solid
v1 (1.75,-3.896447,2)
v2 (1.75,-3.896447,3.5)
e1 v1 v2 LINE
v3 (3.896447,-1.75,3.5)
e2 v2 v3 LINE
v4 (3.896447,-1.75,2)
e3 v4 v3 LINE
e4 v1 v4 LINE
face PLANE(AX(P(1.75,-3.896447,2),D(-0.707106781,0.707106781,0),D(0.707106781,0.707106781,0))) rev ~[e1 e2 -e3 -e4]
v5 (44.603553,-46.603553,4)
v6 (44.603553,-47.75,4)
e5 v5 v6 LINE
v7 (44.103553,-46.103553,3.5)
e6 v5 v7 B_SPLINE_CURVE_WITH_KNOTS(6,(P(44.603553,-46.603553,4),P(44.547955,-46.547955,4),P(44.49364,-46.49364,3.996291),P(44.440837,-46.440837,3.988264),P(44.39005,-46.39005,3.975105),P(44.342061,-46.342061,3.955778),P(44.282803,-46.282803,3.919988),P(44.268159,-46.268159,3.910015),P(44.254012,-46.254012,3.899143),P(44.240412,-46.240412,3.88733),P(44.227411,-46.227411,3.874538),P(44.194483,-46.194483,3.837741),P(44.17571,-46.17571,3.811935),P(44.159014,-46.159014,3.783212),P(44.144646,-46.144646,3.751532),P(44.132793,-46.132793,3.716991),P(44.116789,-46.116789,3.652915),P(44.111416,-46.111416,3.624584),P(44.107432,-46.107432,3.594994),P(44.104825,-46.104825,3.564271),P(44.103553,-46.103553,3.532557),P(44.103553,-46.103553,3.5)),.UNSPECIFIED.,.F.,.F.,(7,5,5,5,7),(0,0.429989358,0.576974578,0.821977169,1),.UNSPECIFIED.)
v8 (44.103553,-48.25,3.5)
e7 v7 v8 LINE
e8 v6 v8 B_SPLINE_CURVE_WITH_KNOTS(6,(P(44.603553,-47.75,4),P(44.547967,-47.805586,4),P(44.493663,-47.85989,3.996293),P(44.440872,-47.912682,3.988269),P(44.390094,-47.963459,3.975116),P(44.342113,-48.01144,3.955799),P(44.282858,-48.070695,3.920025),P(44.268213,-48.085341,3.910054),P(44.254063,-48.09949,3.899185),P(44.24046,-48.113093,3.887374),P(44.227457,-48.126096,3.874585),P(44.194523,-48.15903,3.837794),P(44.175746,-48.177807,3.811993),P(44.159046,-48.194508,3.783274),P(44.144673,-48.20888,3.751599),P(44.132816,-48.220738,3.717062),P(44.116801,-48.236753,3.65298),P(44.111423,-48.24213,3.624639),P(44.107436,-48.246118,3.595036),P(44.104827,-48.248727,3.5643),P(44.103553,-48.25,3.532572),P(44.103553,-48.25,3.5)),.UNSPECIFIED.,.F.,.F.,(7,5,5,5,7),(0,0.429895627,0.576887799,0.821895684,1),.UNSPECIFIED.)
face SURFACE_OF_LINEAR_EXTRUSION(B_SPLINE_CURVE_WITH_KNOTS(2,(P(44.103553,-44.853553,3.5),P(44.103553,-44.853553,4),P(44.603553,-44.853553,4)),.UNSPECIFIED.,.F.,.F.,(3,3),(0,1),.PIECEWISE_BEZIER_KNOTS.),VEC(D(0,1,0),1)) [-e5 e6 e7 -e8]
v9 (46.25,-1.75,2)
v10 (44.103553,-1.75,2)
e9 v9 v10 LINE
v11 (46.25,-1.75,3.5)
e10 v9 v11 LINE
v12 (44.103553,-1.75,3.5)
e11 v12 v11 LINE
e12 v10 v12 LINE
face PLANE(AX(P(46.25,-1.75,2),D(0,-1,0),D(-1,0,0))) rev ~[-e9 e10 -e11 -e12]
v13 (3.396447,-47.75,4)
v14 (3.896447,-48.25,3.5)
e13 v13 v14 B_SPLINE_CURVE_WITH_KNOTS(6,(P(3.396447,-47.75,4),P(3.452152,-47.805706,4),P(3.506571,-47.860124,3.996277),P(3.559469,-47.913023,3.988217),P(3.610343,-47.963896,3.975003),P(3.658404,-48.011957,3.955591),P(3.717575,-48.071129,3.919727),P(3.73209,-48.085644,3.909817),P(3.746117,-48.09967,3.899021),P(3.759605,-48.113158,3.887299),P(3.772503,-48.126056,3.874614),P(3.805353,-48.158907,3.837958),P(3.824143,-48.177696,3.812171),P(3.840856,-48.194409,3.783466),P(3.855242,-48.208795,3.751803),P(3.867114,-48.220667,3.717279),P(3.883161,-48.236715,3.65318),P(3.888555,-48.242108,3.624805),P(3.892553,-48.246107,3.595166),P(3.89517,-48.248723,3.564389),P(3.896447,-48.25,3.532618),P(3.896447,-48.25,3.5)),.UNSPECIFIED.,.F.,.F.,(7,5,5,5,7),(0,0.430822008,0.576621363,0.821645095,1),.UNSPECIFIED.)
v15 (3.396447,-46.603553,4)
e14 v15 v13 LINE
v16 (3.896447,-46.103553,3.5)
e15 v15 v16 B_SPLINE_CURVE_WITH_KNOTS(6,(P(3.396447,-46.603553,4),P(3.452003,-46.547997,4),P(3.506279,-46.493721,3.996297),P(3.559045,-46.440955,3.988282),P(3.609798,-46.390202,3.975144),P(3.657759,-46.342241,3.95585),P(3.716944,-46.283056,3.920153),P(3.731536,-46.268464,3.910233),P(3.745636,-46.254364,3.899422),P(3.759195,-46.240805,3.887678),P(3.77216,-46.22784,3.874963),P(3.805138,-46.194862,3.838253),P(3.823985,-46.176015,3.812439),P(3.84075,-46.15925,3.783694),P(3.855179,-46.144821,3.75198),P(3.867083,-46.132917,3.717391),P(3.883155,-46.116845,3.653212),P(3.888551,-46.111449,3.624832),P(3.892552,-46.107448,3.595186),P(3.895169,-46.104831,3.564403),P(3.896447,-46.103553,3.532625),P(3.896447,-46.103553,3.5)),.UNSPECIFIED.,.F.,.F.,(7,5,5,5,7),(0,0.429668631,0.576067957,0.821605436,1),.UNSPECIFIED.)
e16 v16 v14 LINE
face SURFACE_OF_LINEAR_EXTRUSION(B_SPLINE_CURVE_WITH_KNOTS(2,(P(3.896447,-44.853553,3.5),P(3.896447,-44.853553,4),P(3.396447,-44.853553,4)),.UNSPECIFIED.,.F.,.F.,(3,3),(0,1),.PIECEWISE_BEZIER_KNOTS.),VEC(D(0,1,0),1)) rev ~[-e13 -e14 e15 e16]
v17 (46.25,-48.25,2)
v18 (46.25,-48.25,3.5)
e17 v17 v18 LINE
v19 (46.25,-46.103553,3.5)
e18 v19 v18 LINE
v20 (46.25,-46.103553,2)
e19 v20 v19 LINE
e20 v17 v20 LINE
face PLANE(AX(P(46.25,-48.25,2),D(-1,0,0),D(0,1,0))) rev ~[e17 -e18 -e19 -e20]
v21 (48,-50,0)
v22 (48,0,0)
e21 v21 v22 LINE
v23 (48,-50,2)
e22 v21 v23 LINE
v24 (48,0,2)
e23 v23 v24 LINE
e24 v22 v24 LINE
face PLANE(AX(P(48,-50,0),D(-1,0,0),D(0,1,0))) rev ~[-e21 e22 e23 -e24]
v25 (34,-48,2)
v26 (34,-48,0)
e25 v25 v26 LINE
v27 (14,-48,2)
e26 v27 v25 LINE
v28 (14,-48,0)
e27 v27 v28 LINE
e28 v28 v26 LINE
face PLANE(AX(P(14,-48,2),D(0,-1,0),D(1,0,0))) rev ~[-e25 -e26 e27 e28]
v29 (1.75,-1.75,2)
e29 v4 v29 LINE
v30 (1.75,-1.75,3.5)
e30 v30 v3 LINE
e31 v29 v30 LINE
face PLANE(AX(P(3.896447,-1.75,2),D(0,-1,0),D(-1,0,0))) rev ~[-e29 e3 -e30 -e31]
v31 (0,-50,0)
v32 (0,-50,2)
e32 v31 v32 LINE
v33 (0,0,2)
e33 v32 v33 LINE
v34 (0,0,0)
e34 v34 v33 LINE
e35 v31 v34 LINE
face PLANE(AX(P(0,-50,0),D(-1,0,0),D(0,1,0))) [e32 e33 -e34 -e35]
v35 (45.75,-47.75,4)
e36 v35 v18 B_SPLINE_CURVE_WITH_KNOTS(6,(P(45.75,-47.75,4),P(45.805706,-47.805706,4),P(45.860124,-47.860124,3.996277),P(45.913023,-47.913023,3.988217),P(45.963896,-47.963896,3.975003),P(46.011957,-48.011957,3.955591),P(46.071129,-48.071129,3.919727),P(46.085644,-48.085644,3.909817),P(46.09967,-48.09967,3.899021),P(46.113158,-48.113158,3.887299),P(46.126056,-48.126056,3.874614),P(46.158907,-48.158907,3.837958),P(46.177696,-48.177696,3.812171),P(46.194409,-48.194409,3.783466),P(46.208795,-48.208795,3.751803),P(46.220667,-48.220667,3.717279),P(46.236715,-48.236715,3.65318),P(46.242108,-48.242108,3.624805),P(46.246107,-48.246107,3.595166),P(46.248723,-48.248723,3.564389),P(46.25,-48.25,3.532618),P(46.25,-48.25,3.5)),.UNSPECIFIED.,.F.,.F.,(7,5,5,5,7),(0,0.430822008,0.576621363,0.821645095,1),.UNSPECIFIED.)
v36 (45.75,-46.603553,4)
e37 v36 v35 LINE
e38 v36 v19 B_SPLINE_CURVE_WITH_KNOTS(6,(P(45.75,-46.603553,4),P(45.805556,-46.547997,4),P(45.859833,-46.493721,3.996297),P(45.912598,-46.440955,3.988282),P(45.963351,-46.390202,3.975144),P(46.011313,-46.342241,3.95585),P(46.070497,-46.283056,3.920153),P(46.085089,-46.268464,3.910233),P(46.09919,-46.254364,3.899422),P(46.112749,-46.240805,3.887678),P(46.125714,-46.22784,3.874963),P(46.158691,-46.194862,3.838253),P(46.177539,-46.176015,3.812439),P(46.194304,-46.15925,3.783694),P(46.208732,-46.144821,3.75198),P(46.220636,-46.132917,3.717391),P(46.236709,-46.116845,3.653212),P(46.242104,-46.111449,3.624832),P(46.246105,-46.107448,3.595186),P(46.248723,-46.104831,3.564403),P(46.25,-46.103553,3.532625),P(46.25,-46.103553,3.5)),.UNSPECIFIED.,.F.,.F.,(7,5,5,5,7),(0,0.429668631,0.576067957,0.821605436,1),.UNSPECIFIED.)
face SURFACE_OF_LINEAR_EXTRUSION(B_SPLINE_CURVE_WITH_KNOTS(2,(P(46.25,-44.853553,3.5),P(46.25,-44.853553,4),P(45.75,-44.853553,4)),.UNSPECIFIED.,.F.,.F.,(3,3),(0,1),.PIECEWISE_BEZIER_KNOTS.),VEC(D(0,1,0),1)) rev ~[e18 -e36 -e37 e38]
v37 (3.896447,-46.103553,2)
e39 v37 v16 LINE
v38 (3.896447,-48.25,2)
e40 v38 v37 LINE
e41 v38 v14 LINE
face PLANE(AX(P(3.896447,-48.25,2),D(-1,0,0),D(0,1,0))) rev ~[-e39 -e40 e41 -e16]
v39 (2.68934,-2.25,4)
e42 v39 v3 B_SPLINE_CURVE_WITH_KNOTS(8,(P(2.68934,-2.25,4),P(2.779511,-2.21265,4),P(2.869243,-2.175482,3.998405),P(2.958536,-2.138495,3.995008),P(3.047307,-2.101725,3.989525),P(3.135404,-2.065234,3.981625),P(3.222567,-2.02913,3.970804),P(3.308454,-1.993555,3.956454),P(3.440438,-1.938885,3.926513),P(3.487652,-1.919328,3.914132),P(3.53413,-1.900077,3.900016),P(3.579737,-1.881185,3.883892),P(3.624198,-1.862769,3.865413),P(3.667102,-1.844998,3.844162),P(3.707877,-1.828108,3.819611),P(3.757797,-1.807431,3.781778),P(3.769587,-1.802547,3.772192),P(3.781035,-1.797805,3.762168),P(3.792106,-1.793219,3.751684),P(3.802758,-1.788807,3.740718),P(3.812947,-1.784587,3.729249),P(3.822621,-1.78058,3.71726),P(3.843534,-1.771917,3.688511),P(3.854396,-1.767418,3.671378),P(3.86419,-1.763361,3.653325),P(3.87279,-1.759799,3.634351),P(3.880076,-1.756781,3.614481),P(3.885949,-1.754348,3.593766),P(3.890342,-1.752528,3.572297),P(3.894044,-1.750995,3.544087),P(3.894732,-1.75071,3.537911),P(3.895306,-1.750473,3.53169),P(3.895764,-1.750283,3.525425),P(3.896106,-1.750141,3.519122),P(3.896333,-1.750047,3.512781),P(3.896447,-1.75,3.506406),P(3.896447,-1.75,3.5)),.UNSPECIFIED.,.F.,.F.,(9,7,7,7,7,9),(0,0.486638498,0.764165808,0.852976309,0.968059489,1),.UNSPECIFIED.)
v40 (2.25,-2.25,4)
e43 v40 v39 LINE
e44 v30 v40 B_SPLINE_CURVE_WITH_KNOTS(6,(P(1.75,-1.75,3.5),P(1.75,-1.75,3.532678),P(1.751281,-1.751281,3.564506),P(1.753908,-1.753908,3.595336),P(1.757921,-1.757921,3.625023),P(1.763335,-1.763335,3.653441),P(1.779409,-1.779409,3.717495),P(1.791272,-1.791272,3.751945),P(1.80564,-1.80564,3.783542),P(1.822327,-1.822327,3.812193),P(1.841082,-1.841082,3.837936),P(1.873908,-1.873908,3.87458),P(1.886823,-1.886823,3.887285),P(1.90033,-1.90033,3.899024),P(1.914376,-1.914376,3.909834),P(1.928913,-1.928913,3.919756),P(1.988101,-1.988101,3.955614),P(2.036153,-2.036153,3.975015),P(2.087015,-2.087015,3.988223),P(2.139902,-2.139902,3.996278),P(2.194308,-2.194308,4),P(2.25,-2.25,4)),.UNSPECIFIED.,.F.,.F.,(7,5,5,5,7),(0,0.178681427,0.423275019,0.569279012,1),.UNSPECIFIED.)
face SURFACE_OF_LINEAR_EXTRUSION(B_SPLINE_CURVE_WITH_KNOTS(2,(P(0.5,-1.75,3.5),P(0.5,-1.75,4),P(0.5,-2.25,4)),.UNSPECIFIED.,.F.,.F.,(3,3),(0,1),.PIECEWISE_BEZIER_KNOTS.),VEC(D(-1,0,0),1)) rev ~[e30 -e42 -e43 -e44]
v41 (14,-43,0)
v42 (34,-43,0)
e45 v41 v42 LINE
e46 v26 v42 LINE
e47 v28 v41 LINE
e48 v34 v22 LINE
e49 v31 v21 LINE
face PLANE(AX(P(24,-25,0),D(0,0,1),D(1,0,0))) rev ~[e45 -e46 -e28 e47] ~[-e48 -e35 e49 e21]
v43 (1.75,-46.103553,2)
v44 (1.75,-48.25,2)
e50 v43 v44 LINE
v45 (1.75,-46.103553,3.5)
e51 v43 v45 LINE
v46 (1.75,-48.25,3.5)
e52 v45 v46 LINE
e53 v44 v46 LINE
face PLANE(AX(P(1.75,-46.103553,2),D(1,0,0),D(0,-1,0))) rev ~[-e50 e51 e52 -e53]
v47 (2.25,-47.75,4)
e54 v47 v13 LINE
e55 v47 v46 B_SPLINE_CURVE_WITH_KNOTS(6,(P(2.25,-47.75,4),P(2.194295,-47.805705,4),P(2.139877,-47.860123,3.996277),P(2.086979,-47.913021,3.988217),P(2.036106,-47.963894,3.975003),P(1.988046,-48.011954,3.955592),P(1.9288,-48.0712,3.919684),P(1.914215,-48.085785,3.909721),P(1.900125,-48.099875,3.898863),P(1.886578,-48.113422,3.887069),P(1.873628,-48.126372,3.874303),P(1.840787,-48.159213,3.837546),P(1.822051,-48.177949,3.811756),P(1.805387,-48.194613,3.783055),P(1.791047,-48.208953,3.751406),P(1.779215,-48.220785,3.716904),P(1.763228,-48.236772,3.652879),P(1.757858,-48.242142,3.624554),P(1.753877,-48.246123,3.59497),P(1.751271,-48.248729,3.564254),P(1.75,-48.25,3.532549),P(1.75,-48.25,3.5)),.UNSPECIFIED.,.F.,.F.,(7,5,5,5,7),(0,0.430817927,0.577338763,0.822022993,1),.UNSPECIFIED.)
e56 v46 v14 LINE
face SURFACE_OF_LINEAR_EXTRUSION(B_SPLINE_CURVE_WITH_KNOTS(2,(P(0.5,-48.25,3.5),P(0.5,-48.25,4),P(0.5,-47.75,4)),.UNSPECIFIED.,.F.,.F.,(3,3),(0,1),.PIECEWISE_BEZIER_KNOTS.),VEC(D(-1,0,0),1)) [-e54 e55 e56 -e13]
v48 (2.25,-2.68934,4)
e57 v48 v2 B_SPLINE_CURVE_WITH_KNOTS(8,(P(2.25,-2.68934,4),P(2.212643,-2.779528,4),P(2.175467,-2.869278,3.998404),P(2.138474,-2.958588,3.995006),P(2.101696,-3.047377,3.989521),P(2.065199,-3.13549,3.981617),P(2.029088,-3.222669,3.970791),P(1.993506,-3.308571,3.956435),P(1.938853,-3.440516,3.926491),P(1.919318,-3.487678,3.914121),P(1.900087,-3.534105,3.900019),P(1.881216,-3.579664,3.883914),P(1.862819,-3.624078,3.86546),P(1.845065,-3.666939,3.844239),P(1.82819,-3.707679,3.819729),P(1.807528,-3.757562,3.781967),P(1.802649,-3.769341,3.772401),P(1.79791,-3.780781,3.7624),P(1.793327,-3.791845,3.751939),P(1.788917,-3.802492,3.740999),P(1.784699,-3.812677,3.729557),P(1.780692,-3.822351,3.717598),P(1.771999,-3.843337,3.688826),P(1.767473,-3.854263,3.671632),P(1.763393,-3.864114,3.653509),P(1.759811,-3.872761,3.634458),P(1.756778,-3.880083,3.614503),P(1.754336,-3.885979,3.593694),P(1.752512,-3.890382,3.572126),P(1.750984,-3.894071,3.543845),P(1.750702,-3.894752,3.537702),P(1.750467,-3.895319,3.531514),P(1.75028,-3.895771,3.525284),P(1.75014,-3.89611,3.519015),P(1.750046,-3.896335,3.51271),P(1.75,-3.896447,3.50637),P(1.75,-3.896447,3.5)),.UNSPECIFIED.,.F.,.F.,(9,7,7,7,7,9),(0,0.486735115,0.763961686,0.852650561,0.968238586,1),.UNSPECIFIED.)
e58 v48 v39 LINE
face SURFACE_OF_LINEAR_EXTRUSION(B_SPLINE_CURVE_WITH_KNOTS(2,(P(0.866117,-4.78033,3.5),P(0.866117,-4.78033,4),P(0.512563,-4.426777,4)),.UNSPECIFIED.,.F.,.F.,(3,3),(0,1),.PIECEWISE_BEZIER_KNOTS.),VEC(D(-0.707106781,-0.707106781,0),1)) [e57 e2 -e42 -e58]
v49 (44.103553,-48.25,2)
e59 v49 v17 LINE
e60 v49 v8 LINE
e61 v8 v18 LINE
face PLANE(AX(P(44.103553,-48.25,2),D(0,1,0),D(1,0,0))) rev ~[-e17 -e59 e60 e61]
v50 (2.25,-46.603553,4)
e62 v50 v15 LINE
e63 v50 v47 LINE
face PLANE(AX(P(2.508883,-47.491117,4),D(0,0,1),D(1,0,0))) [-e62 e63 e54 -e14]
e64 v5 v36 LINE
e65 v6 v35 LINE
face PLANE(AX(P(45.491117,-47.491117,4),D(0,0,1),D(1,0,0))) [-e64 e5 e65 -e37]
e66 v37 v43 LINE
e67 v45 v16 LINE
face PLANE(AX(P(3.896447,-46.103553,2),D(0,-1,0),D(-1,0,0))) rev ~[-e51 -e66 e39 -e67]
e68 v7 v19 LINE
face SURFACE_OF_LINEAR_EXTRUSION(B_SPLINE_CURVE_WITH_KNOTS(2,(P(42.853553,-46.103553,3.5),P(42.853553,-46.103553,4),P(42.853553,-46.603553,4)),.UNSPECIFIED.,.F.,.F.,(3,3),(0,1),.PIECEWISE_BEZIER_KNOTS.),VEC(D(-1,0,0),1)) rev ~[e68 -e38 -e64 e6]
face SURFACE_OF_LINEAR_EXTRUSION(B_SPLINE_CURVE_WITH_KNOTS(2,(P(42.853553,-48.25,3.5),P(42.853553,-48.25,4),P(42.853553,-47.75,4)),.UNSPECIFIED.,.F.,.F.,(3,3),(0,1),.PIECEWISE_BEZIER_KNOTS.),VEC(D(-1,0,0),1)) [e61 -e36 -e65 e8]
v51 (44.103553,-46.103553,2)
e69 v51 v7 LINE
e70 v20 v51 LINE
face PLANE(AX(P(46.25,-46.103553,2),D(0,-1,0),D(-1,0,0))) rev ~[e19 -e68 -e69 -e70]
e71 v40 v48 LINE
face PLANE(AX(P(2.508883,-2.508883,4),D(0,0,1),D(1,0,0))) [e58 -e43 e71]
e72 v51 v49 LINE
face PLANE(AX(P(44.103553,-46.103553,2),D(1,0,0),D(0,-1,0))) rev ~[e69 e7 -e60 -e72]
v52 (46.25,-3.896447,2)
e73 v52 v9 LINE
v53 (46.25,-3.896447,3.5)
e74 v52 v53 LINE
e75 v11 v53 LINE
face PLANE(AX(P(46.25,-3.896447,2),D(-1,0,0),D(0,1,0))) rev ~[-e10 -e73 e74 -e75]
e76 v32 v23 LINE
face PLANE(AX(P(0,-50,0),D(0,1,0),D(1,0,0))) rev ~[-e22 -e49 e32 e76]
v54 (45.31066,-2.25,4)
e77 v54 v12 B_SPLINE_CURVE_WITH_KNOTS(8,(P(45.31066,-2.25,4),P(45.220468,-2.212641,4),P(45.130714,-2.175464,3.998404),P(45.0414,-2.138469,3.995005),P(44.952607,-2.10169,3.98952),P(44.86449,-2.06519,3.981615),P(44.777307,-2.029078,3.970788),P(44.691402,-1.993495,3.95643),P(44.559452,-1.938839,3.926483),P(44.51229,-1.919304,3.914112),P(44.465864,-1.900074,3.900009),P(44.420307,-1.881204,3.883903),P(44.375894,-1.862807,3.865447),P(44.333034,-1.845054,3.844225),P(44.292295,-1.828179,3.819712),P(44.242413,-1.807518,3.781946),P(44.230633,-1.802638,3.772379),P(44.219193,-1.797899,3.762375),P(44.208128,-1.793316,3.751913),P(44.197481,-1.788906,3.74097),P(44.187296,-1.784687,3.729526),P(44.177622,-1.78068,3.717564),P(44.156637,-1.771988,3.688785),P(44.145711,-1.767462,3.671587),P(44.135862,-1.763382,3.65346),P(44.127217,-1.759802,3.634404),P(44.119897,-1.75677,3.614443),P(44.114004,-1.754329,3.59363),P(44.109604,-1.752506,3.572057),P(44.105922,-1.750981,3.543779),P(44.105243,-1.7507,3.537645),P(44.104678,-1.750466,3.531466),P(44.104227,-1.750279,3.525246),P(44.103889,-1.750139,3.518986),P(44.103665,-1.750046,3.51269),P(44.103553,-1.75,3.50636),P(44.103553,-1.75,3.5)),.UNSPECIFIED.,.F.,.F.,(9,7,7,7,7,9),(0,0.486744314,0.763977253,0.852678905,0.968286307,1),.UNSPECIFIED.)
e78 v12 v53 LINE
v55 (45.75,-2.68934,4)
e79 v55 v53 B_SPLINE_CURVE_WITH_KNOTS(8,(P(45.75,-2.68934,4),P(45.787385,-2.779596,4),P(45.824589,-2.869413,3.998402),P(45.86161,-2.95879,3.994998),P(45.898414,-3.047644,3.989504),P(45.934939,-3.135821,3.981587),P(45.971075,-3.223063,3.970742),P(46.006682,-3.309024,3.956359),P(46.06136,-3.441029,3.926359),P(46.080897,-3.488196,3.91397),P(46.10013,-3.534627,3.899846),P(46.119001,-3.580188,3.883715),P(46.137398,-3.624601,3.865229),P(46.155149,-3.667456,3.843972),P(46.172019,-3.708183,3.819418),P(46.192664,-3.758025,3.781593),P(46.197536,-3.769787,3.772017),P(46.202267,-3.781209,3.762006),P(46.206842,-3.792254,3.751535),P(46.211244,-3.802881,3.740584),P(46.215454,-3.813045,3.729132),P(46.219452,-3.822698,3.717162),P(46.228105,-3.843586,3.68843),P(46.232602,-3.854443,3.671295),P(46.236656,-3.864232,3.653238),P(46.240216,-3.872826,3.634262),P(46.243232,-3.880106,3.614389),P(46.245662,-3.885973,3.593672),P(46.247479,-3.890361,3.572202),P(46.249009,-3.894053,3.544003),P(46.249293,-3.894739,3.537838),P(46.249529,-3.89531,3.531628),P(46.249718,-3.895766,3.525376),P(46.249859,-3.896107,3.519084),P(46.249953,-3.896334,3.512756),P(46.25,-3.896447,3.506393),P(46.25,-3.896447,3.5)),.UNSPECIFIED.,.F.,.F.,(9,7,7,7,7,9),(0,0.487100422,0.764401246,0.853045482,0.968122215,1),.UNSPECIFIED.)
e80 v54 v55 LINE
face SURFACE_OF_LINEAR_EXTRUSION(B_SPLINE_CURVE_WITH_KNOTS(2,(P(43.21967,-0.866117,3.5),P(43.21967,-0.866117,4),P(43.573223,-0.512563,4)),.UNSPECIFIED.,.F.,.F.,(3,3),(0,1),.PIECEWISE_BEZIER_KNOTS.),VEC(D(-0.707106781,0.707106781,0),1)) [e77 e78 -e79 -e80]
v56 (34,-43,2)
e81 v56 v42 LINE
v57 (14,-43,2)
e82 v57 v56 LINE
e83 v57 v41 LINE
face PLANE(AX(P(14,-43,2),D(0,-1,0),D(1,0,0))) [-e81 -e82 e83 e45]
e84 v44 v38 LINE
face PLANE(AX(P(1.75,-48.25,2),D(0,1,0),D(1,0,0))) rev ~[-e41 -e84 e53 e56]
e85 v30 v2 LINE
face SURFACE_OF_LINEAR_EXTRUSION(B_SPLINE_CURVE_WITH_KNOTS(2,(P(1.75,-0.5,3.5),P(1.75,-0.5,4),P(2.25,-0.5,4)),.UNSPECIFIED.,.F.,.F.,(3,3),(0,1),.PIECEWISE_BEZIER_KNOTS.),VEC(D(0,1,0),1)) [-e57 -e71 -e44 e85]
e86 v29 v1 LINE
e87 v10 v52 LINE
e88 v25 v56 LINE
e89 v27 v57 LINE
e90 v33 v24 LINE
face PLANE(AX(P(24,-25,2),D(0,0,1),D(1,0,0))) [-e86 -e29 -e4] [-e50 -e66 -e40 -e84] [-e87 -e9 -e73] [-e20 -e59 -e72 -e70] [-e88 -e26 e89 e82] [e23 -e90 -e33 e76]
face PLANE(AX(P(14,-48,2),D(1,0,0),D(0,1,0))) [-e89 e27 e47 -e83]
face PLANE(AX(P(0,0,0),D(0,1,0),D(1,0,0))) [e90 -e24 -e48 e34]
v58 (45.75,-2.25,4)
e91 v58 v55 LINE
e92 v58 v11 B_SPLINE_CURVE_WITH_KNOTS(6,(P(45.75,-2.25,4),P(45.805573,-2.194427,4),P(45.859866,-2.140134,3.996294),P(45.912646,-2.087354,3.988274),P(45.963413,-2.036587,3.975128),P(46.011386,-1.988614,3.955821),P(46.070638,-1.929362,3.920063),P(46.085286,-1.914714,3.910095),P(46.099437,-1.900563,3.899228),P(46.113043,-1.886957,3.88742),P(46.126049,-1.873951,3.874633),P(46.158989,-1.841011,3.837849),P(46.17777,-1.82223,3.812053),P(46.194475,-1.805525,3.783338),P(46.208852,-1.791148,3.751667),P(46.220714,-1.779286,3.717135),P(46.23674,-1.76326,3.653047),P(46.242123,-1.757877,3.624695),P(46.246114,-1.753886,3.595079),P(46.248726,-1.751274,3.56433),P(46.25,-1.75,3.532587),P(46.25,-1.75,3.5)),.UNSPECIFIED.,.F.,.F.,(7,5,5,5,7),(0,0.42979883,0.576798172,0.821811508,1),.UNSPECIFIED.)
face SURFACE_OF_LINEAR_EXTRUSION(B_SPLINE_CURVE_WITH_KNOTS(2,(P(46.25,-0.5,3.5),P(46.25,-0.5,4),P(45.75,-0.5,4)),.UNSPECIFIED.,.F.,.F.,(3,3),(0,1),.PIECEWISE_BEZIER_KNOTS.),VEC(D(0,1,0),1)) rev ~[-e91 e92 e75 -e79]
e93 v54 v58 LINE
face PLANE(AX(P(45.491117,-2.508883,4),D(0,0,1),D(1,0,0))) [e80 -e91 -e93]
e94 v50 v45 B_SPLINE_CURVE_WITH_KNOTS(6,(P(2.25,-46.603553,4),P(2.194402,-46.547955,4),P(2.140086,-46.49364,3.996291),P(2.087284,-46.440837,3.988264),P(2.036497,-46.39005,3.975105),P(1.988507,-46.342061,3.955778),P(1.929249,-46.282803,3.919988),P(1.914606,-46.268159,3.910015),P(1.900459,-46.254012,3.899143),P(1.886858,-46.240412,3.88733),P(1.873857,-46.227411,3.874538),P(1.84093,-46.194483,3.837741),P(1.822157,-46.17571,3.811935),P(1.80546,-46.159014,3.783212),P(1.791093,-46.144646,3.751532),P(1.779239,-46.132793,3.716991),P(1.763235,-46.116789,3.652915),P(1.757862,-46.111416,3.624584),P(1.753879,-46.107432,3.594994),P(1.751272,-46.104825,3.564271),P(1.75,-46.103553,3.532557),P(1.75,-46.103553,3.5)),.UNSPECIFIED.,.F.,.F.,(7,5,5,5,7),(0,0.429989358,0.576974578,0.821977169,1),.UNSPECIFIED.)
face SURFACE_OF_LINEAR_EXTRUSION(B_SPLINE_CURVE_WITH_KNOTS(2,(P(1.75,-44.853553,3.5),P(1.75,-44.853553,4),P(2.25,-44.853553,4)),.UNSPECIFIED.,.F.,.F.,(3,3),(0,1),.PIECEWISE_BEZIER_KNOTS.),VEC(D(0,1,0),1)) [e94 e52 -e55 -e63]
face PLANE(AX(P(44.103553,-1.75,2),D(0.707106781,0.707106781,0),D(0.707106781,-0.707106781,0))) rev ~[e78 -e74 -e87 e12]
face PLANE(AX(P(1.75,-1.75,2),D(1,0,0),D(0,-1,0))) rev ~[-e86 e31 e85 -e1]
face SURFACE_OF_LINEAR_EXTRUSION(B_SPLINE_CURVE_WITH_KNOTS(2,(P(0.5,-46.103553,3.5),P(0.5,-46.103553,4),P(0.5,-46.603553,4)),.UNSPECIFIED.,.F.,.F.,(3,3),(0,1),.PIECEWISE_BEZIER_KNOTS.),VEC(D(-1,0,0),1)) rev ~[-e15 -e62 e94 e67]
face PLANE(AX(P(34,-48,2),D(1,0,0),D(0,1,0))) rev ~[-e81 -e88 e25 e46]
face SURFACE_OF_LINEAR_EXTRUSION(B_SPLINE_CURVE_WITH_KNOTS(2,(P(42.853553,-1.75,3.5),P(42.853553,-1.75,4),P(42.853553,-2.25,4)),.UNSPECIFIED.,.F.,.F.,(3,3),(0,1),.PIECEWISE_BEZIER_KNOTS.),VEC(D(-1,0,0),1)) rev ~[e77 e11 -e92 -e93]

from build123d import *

# Parameters (mm, degrees)
F0_W         = 48
F0_H         = 50
F1_DEPTH     = 2
F3_DEPTH     = 2
F4_W         = 20
F4_H         = 5
F5_DEPTH     = 25
F6_T1_DEPTH  = 4.6464466094
F6_T3_DEPTH  = 4.6464466094
F6_T5_DEPTH  = 4.6464466094
F6_T7_DEPTH  = 5.5355339059
F6_T9_DEPTH  = 5.5355339059
F6_T11_DEPTH = 4.6464466094


# Not quite as in the source:
# - a fillet or chamfer that OpenCascade refuses, or shapes differently, is made with other operations: its cross-section is extruded or revolved along the edge and cut away or added
# - a feature names something its author has since deleted; it is built from what else it names


with BuildPart() as f1:
    # F0 (on Top) → F1 (new body)
    with BuildSketch(Plane.XY):
        with Locations((24, -25)):
            Rectangle(F0_W, F0_H)
    extrude(amount=F1_DEPTH)

    # F2 (on face) → F3 (join)
    with BuildSketch(Plane.XY.offset(2)):
        Polygon((1.75, -1.75), (1.75, -3.8964466094), (3.8964466094, -1.75), align=None)
        Polygon((44.1035533906, -1.75), (46.25, -3.8964466094), (46.25, -1.75), align=None)
        Polygon((46.25, -48.25), (46.25, -46.1035533906), (44.1035533906, -48.25), align=None)
        Polygon((3.8964466094, -48.25), (1.75, -46.1035533906), (1.75, -48.25), align=None)
        Polygon((3.8964466094, -46.1035533906), (1.75, -46.1035533906), (3.8964466094, -48.25), align=None)
        Polygon((44.1035533906, -48.25), (46.25, -46.1035533906), (44.1035533906, -46.1035533906), align=None)
    extrude(amount=F3_DEPTH)

    # F4 (on face) → F5 (cut)
    with BuildSketch(Plane.XY.offset(2)):
        with Locations((24, -45.5)):
            Rectangle(F4_W, F4_H)
    extrude(amount=-F5_DEPTH, mode=Mode.SUBTRACT)

    # F6: fillet of radius 0.5 on 14 edges, made by hand

    # F6_s2 → F6_t1 (cut)
    with BuildSketch(Plane.XZ.offset(44.8535533906)):
        with BuildLine():
            add(Edge.make_bspline(
                [(1.75, 3.5), (1.75, 4), (2.25, 4)],
                knots=[0, 0, 0, 1, 1, 1], degree=2, weights=[1, 1, 1]))
            Line((2.25, 4), (1.75, 4))
            Line((1.75, 4), (1.75, 3.5))
        make_face()
        with BuildLine():
            add(Edge.make_bspline(
                [(3.8964466094, 3.5), (3.8964466094, 4), (3.3964466094, 4)],
                knots=[0, 0, 0, 1, 1, 1], degree=2, weights=[1, 1, 1]))
            Line((3.3964466094, 4), (3.8964466094, 4))
            Line((3.8964466094, 4), (3.8964466094, 3.5))
        make_face()
        with BuildLine():
            add(Edge.make_bspline(
                [(46.25, 3.5), (46.25, 4), (45.75, 4)],
                knots=[0, 0, 0, 1, 1, 1], degree=2, weights=[1, 1, 1]))
            Line((45.75, 4), (46.25, 4))
            Line((46.25, 4), (46.25, 3.5))
        make_face()
        with BuildLine():
            add(Edge.make_bspline(
                [(44.1035533906, 3.5), (44.1035533906, 4), (44.6035533906, 4)],
                knots=[0, 0, 0, 1, 1, 1], degree=2, weights=[1, 1, 1]))
            Line((44.6035533906, 4), (44.1035533906, 4))
            Line((44.1035533906, 4), (44.1035533906, 3.5))
        make_face()
    extrude(amount=F6_T1_DEPTH, mode=Mode.SUBTRACT)

    # F6_s4 → F6_t3 (cut)
    with BuildSketch(Plane.YZ.offset(0.5)):
        with BuildLine():
            add(Edge.make_bspline(
                [(-48.25, 3.5), (-48.25, 4), (-47.75, 4)],
                knots=[0, 0, 0, 1, 1, 1], degree=2, weights=[1, 1, 1]))
            Line((-47.75, 4), (-48.25, 4))
            Line((-48.25, 4), (-48.25, 3.5))
        make_face()
        with BuildLine():
            add(Edge.make_bspline(
                [(-46.1035533906, 3.5), (-46.1035533906, 4), (-46.6035533906, 4)],
                knots=[0, 0, 0, 1, 1, 1], degree=2, weights=[1, 1, 1]))
            Line((-46.6035533906, 4), (-46.1035533906, 4))
            Line((-46.1035533906, 4), (-46.1035533906, 3.5))
        make_face()
        with BuildLine():
            add(Edge.make_bspline(
                [(-1.75, 3.5), (-1.75, 4), (-2.25, 4)],
                knots=[0, 0, 0, 1, 1, 1], degree=2, weights=[1, 1, 1]))
            Line((-2.25, 4), (-1.75, 4))
            Line((-1.75, 4), (-1.75, 3.5))
        make_face()
    extrude(amount=F6_T3_DEPTH, mode=Mode.SUBTRACT)

    # F6_s6 → F6_t5 (cut)
    with BuildSketch(Plane.XZ.offset(0.5)):
        with BuildLine():
            add(Edge.make_bspline(
                [(1.75, 3.5), (1.75, 4), (2.25, 4)],
                knots=[0, 0, 0, 1, 1, 1], degree=2, weights=[1, 1, 1]))
            Line((2.25, 4), (1.75, 4))
            Line((1.75, 4), (1.75, 3.5))
        make_face()
        with BuildLine():
            add(Edge.make_bspline(
                [(46.25, 3.5), (46.25, 4), (45.75, 4)],
                knots=[0, 0, 0, 1, 1, 1], degree=2, weights=[1, 1, 1]))
            Line((45.75, 4), (46.25, 4))
            Line((46.25, 4), (46.25, 3.5))
        make_face()
    extrude(amount=F6_T5_DEPTH, mode=Mode.SUBTRACT)

    # F6_s8 → F6_t7 (cut)
    with BuildSketch(Plane(origin=(-1.9571067812, -1.9571067812, 0), x_dir=(0, 0, 1), z_dir=(0.7071067812, 0.7071067812, 0))):
        with BuildLine():
            add(Edge.make_bspline(
                [(3.5, 3.9926406871), (4, 3.9926406871), (4, 3.4926406871)],
                knots=[0, 0, 0, 1, 1, 1], degree=2, weights=[1, 1, 1]))
            Line((4, 3.4926406871), (4, 3.9926406871))
            Line((4, 3.9926406871), (3.5, 3.9926406871))
        make_face()
    extrude(amount=F6_T7_DEPTH, mode=Mode.SUBTRACT)

    # F6_s10 → F6_t9 (cut)
    with BuildSketch(Plane(origin=(22.0428932188, -22.0428932188, 0), x_dir=(0, 0, 1), z_dir=(0.7071067812, -0.7071067812, 0))):
        with BuildLine():
            add(Edge.make_bspline(
                [(3.5, -29.9484848098), (4, -29.9484848098), (4, -30.4484848098)],
                knots=[0, 0, 0, 1, 1, 1], degree=2, weights=[1, 1, 1]))
            Line((4, -30.4484848098), (4, -29.9484848098))
            Line((4, -29.9484848098), (3.5, -29.9484848098))
        make_face()
    extrude(amount=F6_T9_DEPTH, mode=Mode.SUBTRACT)

    # F6_s12 → F6_t11 (cut)
    with BuildSketch(Plane.YZ.offset(42.8535533906)):
        with BuildLine():
            add(Edge.make_bspline(
                [(-1.75, 3.5), (-1.75, 4), (-2.25, 4)],
                knots=[0, 0, 0, 1, 1, 1], degree=2, weights=[1, 1, 1]))
            Line((-2.25, 4), (-1.75, 4))
            Line((-1.75, 4), (-1.75, 3.5))
        make_face()
        with BuildLine():
            add(Edge.make_bspline(
                [(-46.1035533906, 3.5), (-46.1035533906, 4), (-46.6035533906, 4)],
                knots=[0, 0, 0, 1, 1, 1], degree=2, weights=[1, 1, 1]))
            Line((-46.6035533906, 4), (-46.1035533906, 4))
            Line((-46.1035533906, 4), (-46.1035533906, 3.5))
        make_face()
        with BuildLine():
            add(Edge.make_bspline(
                [(-48.25, 3.5), (-48.25, 4), (-47.75, 4)],
                knots=[0, 0, 0, 1, 1, 1], degree=2, weights=[1, 1, 1]))
            Line((-47.75, 4), (-48.25, 4))
            Line((-48.25, 4), (-48.25, 3.5))
        make_face()
    extrude(amount=F6_T11_DEPTH, mode=Mode.SUBTRACT)


solid = f1.part
